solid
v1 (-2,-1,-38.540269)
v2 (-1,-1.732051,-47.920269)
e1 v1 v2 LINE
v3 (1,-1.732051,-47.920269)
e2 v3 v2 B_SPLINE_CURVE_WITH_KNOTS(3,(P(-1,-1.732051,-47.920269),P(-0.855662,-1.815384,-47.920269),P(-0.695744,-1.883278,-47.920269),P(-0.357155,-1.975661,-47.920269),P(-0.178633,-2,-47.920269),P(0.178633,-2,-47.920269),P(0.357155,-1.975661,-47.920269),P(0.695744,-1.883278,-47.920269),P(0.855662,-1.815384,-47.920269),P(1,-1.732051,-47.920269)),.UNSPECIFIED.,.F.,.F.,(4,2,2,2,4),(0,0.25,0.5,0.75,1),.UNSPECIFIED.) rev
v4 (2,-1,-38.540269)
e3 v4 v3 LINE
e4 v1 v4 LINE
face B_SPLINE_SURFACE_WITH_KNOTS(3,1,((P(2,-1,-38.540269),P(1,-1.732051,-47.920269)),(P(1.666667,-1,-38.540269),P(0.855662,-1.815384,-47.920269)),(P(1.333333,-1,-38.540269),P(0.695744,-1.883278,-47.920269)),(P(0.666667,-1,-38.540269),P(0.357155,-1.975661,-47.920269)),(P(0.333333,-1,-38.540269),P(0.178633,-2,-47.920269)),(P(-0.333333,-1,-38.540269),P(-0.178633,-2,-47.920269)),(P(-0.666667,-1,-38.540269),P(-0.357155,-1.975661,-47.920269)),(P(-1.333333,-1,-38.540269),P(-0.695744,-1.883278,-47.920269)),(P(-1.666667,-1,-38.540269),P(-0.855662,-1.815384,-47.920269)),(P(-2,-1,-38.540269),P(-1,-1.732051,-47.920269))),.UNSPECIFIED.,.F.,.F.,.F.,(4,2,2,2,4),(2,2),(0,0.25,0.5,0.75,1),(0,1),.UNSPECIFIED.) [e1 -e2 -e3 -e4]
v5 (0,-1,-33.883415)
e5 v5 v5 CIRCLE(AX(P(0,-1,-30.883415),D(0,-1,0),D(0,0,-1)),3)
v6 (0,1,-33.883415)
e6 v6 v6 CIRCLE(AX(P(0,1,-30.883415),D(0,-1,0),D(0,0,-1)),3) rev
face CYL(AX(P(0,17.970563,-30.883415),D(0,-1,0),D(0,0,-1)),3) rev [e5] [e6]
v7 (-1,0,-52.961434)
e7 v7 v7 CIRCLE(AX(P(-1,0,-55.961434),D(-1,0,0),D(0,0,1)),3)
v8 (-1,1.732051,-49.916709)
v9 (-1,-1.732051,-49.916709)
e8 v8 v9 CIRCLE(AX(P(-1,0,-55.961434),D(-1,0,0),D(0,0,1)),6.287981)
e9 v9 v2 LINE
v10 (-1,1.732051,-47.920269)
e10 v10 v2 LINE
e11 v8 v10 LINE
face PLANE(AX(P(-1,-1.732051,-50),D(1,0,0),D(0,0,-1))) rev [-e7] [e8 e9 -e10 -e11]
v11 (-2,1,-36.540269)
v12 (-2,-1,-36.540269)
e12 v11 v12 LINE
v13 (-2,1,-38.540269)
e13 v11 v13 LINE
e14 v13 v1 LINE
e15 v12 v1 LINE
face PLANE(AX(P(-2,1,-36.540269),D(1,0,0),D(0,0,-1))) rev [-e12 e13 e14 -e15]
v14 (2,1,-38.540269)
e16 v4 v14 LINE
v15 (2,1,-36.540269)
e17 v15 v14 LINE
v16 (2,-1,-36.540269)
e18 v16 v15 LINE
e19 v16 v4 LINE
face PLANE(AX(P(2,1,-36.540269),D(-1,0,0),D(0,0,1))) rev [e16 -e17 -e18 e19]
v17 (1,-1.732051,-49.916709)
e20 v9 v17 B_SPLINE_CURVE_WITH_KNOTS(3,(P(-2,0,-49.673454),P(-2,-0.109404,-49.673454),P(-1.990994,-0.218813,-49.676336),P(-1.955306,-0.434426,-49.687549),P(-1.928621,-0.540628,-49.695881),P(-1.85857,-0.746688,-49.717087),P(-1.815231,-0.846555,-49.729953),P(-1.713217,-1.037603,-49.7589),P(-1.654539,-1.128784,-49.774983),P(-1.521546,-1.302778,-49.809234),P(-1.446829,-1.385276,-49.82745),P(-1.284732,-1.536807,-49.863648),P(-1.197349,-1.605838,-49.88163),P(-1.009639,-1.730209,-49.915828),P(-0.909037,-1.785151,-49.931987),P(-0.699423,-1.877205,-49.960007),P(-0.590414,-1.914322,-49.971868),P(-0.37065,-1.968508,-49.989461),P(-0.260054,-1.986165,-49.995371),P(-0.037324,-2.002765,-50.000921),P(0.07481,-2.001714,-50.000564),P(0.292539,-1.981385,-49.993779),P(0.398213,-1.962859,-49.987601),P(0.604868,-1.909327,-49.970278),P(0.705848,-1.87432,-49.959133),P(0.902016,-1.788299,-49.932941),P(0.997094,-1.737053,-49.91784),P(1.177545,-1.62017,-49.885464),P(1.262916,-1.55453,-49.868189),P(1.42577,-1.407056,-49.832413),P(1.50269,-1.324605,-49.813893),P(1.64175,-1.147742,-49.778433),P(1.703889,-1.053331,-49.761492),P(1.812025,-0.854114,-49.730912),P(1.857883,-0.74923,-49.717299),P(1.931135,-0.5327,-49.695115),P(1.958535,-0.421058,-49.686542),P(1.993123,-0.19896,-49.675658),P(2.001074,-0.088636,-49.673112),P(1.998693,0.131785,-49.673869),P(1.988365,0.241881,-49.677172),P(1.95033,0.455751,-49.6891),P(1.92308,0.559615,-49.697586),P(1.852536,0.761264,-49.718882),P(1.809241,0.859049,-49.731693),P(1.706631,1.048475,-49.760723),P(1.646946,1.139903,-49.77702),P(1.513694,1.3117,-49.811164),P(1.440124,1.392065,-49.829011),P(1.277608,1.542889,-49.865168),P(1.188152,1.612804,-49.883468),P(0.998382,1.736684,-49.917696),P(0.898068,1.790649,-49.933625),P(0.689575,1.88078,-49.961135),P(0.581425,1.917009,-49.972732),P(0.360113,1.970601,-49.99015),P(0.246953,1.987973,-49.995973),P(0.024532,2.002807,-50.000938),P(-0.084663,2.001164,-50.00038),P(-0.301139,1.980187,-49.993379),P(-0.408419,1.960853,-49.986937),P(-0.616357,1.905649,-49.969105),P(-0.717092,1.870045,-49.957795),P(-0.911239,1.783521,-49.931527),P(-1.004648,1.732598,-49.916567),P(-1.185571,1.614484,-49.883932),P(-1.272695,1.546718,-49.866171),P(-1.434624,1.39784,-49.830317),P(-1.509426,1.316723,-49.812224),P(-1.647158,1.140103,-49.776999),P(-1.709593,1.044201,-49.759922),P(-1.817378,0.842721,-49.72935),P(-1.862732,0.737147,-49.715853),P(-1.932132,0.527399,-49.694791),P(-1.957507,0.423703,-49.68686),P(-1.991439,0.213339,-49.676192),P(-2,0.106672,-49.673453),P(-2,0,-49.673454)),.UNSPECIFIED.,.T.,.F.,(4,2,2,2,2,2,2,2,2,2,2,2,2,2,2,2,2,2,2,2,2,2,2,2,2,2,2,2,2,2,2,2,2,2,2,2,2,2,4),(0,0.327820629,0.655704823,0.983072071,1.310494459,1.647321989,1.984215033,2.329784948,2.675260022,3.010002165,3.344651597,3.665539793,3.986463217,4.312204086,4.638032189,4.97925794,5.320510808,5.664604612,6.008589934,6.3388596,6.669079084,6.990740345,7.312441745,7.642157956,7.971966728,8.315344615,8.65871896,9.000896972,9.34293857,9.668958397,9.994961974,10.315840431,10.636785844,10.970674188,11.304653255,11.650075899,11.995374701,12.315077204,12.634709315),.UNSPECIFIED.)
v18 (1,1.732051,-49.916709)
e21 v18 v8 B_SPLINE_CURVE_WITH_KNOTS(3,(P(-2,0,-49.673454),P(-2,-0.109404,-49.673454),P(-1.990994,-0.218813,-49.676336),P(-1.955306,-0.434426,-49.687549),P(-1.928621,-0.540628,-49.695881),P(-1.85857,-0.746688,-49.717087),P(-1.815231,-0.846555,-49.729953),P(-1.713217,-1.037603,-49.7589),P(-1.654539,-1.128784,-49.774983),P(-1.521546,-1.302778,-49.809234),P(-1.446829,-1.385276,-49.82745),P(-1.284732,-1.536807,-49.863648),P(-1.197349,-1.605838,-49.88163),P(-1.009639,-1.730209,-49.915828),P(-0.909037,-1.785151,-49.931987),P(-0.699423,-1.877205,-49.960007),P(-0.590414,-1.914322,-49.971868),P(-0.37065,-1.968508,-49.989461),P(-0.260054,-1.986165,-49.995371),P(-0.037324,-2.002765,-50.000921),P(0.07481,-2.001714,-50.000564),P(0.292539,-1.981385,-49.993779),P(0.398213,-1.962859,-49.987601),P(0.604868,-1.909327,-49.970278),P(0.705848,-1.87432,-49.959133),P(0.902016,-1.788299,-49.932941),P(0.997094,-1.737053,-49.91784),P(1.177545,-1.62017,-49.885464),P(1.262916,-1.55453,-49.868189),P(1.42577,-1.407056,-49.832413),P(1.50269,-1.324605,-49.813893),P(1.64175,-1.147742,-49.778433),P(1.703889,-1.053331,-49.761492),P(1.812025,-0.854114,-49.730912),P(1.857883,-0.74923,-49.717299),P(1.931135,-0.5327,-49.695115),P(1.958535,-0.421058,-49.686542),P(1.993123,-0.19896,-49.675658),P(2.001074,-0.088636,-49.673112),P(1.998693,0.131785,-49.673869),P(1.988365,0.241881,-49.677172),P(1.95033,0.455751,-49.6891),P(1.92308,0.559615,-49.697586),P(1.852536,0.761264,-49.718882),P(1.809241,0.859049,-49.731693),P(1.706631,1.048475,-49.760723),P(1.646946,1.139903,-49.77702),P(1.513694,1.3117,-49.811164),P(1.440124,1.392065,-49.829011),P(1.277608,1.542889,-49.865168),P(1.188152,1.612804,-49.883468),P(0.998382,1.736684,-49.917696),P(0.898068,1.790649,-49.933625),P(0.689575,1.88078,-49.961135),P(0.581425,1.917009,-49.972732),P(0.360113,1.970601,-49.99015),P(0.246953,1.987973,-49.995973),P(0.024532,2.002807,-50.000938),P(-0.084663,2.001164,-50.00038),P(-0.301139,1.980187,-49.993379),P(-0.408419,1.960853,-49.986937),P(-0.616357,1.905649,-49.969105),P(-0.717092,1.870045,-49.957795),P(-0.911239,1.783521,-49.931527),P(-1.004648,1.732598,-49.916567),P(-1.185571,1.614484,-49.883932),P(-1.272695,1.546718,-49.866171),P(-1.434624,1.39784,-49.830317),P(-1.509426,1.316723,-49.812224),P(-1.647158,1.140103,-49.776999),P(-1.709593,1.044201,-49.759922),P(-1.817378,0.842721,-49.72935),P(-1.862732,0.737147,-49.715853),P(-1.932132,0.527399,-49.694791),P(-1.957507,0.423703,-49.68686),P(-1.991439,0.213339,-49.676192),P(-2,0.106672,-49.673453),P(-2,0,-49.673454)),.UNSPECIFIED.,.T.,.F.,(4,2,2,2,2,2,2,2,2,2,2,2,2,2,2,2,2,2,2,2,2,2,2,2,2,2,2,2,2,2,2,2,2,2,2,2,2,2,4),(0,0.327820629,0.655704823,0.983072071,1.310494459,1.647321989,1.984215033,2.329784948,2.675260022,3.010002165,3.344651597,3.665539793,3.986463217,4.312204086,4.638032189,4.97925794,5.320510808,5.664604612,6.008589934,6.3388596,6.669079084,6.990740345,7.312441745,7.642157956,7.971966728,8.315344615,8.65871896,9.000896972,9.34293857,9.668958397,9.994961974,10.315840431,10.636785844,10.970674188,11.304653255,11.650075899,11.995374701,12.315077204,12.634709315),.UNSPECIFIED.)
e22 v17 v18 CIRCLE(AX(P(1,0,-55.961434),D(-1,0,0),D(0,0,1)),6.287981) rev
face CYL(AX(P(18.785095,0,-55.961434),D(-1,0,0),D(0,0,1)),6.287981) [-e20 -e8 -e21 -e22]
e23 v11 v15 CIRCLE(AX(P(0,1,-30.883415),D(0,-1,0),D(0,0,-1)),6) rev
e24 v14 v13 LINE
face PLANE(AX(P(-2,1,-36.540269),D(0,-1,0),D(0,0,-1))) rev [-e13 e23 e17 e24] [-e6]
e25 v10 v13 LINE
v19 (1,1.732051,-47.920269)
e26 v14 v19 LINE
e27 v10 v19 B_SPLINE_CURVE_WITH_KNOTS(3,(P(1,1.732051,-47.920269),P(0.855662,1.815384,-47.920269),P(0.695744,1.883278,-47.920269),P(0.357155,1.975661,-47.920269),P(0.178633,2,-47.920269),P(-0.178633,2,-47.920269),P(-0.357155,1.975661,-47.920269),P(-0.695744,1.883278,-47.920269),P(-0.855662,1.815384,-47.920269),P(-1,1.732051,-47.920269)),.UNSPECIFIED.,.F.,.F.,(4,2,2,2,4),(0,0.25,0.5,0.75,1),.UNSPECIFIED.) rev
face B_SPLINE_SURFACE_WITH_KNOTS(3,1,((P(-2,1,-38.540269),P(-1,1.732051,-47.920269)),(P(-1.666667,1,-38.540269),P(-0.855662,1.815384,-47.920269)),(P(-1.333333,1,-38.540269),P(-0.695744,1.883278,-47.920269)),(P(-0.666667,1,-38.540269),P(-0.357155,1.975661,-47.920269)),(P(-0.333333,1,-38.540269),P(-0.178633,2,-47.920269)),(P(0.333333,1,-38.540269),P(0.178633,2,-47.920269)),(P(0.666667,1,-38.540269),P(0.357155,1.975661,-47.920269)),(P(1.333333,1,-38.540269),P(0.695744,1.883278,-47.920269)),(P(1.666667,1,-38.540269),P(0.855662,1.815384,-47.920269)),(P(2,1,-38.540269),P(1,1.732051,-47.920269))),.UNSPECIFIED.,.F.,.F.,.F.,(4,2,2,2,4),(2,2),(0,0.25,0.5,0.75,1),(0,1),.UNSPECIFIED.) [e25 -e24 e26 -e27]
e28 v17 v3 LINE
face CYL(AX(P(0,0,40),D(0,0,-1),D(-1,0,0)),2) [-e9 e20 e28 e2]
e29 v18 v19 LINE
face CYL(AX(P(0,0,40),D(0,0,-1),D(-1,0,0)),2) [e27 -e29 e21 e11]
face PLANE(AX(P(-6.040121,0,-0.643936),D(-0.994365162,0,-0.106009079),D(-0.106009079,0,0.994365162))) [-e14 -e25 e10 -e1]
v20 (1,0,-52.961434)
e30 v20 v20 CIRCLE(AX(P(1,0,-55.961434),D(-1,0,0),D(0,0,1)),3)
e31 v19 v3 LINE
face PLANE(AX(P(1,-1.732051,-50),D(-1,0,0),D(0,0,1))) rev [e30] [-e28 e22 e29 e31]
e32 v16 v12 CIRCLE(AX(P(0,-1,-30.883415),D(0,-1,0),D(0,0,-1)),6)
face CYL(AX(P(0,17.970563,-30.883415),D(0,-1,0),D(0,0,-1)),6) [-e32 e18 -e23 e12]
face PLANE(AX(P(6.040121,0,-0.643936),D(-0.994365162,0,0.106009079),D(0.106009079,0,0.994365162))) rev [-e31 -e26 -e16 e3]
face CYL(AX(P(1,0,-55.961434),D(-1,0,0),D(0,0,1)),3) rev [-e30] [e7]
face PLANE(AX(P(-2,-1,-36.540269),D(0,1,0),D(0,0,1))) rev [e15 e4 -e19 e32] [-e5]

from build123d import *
from build123d.topology import SkipClean

# Parameters (mm, degrees)
SKETCH1_R               = 2
BOSS_EXTRUDE1_DEPTH     = 40
BOSS_EXTRUDE2_START     = 50
BOSS_EXTRUDE2_DEPTH     = 50
SKETCH6_R               = 6.287980689
SKETCH6_R_2             = 2
BOSS_EXTRUDE4_DEPTH     = 2
SKETCH7_R               = 6
BOSS_EXTRUDE5_DEPTH     = 2
CUT_EXTRUDE1_DEPTH      = 64.851309322
CUT_EXTRUDE1_DEPTH_BACK = 64.851309322
SKETCH9_R               = 6
CUT_EXTRUDE2_DEPTH      = 63.85322908
SKETCH11_R              = 2
CUT_EXTRUDE3_DEPTH      = 2
SKETCH13_R              = 6
CUT_EXTRUDE4_DEPTH      = 10
CUT_EXTRUDE5_DEPTH      = 10
CUT_EXTRUDE5_DEPTH_BACK = 10
SKETCH14_W              = 2
SKETCH14_H              = 2
SKETCH17_R              = 3
CUT_EXTRUDE6_DEPTH      = 63.598150172
SKETCH21_W              = 9.38
SKETCH21_H              = 6.916039478
CUT_EXTRUDE7_DEPTH      = 10
SKETCH22_W              = 4
SKETCH22_H              = 2
BOSS_EXTRUDE6_DEPTH     = 2
SKETCH23_R              = 6
SKETCH23_R_2            = 3
BOSS_EXTRUDE7_DEPTH     = 2


with BuildPart() as part:
    # Sketch1 → Boss-Extrude1 (new body)
    with BuildSketch(Plane.XY):
        Circle(SKETCH1_R)
    extrude(amount=BOSS_EXTRUDE1_DEPTH)

    # Sketch2 → Revolve1 (revolve)
    with BuildSketch(Plane(origin=(0, 0, 0), x_dir=(1, 0, 0), z_dir=(0, 1, 0))):
        with BuildLine():
            Line((-9, -40), (9, -40))
            ThreePointArc((9, -40), (0, -31), (-9, -40))
        make_face()
    revolve(axis=Axis((-9, 0, 40), (1, 0, 0)))

    # Sketch3 → Boss-Extrude2 (add)
    with SkipClean():  # the faces are left unmerged after this step: merging them gives an invalid solid
        with BuildSketch(Plane(origin=(0, 0, 0), x_dir=(-1, 0, 0), z_dir=(0, 0, -1)).offset(BOSS_EXTRUDE2_START)):
            with BuildLine():
                Line((1, -1.732050808), (1, 1.732050808))
                ThreePointArc((1, 1.732050808), (0, 2), (-1, 1.732050808))
                Line((-1, 1.732050808), (-1, -1.732050808))
                ThreePointArc((-1, -1.732050808), (0, -2), (1, -1.732050808))
            make_face()
        extrude(amount=-BOSS_EXTRUDE2_DEPTH)

    # Sketch6 → Boss-Extrude4 (add)
    with SkipClean():  # the faces are left unmerged after this step: merging them gives an invalid solid
        with BuildSketch(Plane.ZY.offset(1)):
            with Locations((-55.961434487, 0)):
                Circle(SKETCH6_R)
            with Locations((-55.961434487, 0)):
                Circle(SKETCH6_R_2, mode=Mode.SUBTRACT)
        extrude(amount=-BOSS_EXTRUDE4_DEPTH)

    # Sketch7 → Boss-Extrude5 (add)
    with SkipClean():  # the faces are left unmerged after this step: merging them gives an invalid solid
        with BuildSketch(Plane(origin=(0, 0, 0), x_dir=(1, 0, 0), z_dir=(0, 1, 0))):
            with Locations((0, 30.624189127)):
                Circle(SKETCH7_R)
        extrude(amount=BOSS_EXTRUDE5_DEPTH)

    # Sketch8 → Cut-Extrude1 (cut, two sides: drawn at the far end of the back side and taken through both)
    with BuildSketch(Plane(origin=(0, 2, 0), x_dir=(1, 0, 0), z_dir=(0, 1, 0)).offset(-CUT_EXTRUDE1_DEPTH_BACK)):
        with BuildLine():
            ThreePointArc((0, 24.624189127), (-4.242640687, 26.38154844), (-6, 30.624189127))
            Line((-6, 30.624189127), (-27.198688651, -55.120065689))
            Line((-27.198688651, -55.120065689), (28.23800577, -55.120065689))
            Line((28.23800577, -55.120065689), (6, 30.624189127))
            ThreePointArc((6, 30.624189127), (4.242640687, 26.38154844), (0, 24.624189127))
        make_face()
    extrude(amount=CUT_EXTRUDE1_DEPTH + CUT_EXTRUDE1_DEPTH_BACK, mode=Mode.SUBTRACT)

    # Sketch9 → Cut-Extrude2 (cut, through all)
    with BuildSketch(Plane.XZ):
        with Locations((0, -30.624189127)):
            Circle(SKETCH9_R)
    extrude(amount=CUT_EXTRUDE2_DEPTH, mode=Mode.SUBTRACT)

    # Sketch11 → Cut-Extrude3 (cut)
    with BuildSketch(Plane(origin=(0, 2, 0), x_dir=(1, 0, 0), z_dir=(0, 1, 0))):
        with Locations(Location((0, 30.624189127, 0), (0, 0, 270))):
            Circle(SKETCH11_R)
    extrude(amount=-CUT_EXTRUDE3_DEPTH, mode=Mode.SUBTRACT)

    # Sketch13 → Cut-Extrude4 (cut)
    with BuildSketch(Plane.XZ):
        with Locations((0, -30.624189127)):
            Circle(SKETCH13_R)
    extrude(amount=-CUT_EXTRUDE4_DEPTH, mode=Mode.SUBTRACT)

    # Sketch14 → Cut-Extrude5 (cut, two sides: drawn at the far end of the back side and taken through both)
    with BuildSketch(Plane(origin=(0, 0, 0), x_dir=(1, 0, 0), z_dir=(0, 1, 0)).offset(-CUT_EXTRUDE5_DEPTH_BACK)):
        with Locations((0, 37.54026891)):
            Rectangle(SKETCH14_W, SKETCH14_H)
    extrude(amount=CUT_EXTRUDE5_DEPTH + CUT_EXTRUDE5_DEPTH_BACK, mode=Mode.SUBTRACT)

    # Sketch17 → Cut-Extrude6 (cut, through all)
    with BuildSketch(Plane.ZY.offset(1)):
        with Locations((-55.961434487, 0)):
            Circle(SKETCH17_R)
    extrude(amount=-CUT_EXTRUDE6_DEPTH, mode=Mode.SUBTRACT)

    # Sketch21 → Cut-Extrude7 (cut)
    with BuildSketch(Plane.ZY.offset(1)):
        with Locations((-43.23026891, -0.033704231)):
            Rectangle(SKETCH21_W, SKETCH21_H)
    extrude(amount=-CUT_EXTRUDE7_DEPTH, mode=Mode.SUBTRACT)

    # Loft1: read off the stored shape, not the designer's step
    # Loft1: loft between two sections, ruled curve by curve
    loft1_from = [
        Edge.make_bspline([(-2, 1, -38.54026891), (-1.666666667, 1, -38.54026891), (-1.333333333, 1, -38.54026891), (-0.666666667, 1, -38.54026891), (-0.333333333, 1, -38.54026891), (0.333333333, 1, -38.54026891), (0.666666667, 1, -38.54026891), (1.333333333, 1, -38.54026891), (1.666666667, 1, -38.54026891), (2, 1, -38.54026891)], [0, 0, 0, 0, 0.25, 0.25, 0.5, 0.5, 0.75, 0.75, 1, 1, 1, 1], 3),
        Edge.make_bspline([(2, -1, -38.54026891), (1.666666667, -1, -38.54026891), (1.333333333, -1, -38.54026891), (0.666666667, -1, -38.54026891), (0.333333333, -1, -38.54026891), (-0.333333333, -1, -38.54026891), (-0.666666667, -1, -38.54026891), (-1.333333333, -1, -38.54026891), (-1.666666667, -1, -38.54026891), (-2, -1, -38.54026891)], [0, 0, 0, 0, 0.25, 0.25, 0.5, 0.5, 0.75, 0.75, 1, 1, 1, 1], 3),
        Edge.make_line((2, -1, -38.54026891), (2, 1, -38.54026891)),
        Edge.make_line((-2, 1, -38.54026891), (-2, -1, -38.54026891)),
    ]
    loft1_to = [
        Edge.make_bspline([(-1, 1.732050808, -47.92026891), (-0.855662433, 1.815384141, -47.92026891), (-0.695743587, 1.883277768, -47.92026891), (-0.357154512, 1.975660635, -47.92026891), (-0.178632795, 2, -47.92026891), (0.178632795, 2, -47.92026891), (0.357154512, 1.975660635, -47.92026891), (0.695743587, 1.883277768, -47.92026891), (0.855662433, 1.815384141, -47.92026891), (1, 1.732050808, -47.92026891)], [0, 0, 0, 0, 0.25, 0.25, 0.5, 0.5, 0.75, 0.75, 1, 1, 1, 1], 3),
        Edge.make_bspline([(1, -1.732050808, -47.92026891), (0.855662433, -1.815384141, -47.92026891), (0.695743587, -1.883277768, -47.92026891), (0.357154512, -1.975660635, -47.92026891), (0.178632795, -2, -47.92026891), (-0.178632795, -2, -47.92026891), (-0.357154512, -1.975660635, -47.92026891), (-0.695743587, -1.883277768, -47.92026891), (-0.855662433, -1.815384141, -47.92026891), (-1, -1.732050808, -47.92026891)], [0, 0, 0, 0, 0.25, 0.25, 0.5, 0.5, 0.75, 0.75, 1, 1, 1, 1], 3),
        Edge.make_line((1, -1.732050808, -47.92026891), (1, 1.732050808, -47.92026891)),
        Edge.make_line((-1, 1.732050808, -47.92026891), (-1, -1.732050808, -47.92026891)),
    ]
    loft1 = Solid(Shell([*[Face.make_surface_from_curves(loft1_from[k], loft1_to[k]) for k in range(4)], Face(Wire(loft1_from)), Face(Wire(loft1_to))]))
    add(loft1)

    # Sketch22 → Boss-Extrude6 (add)
    with BuildSketch(Plane.XY.offset(-38.54026891)):
        Rectangle(SKETCH22_W, SKETCH22_H)
    extrude(amount=BOSS_EXTRUDE6_DEPTH)

    # Sketch23 → Boss-Extrude7 (add)
    with BuildSketch(Plane.XZ.offset(1)):
        with Locations((0, -30.883414661)):
            Circle(SKETCH23_R)
        with Locations(Location((0, -30.883414661, 0), (0, 0, 270))):
            Circle(SKETCH23_R_2, mode=Mode.SUBTRACT)
    extrude(amount=-BOSS_EXTRUDE7_DEPTH)


solid = part.part
